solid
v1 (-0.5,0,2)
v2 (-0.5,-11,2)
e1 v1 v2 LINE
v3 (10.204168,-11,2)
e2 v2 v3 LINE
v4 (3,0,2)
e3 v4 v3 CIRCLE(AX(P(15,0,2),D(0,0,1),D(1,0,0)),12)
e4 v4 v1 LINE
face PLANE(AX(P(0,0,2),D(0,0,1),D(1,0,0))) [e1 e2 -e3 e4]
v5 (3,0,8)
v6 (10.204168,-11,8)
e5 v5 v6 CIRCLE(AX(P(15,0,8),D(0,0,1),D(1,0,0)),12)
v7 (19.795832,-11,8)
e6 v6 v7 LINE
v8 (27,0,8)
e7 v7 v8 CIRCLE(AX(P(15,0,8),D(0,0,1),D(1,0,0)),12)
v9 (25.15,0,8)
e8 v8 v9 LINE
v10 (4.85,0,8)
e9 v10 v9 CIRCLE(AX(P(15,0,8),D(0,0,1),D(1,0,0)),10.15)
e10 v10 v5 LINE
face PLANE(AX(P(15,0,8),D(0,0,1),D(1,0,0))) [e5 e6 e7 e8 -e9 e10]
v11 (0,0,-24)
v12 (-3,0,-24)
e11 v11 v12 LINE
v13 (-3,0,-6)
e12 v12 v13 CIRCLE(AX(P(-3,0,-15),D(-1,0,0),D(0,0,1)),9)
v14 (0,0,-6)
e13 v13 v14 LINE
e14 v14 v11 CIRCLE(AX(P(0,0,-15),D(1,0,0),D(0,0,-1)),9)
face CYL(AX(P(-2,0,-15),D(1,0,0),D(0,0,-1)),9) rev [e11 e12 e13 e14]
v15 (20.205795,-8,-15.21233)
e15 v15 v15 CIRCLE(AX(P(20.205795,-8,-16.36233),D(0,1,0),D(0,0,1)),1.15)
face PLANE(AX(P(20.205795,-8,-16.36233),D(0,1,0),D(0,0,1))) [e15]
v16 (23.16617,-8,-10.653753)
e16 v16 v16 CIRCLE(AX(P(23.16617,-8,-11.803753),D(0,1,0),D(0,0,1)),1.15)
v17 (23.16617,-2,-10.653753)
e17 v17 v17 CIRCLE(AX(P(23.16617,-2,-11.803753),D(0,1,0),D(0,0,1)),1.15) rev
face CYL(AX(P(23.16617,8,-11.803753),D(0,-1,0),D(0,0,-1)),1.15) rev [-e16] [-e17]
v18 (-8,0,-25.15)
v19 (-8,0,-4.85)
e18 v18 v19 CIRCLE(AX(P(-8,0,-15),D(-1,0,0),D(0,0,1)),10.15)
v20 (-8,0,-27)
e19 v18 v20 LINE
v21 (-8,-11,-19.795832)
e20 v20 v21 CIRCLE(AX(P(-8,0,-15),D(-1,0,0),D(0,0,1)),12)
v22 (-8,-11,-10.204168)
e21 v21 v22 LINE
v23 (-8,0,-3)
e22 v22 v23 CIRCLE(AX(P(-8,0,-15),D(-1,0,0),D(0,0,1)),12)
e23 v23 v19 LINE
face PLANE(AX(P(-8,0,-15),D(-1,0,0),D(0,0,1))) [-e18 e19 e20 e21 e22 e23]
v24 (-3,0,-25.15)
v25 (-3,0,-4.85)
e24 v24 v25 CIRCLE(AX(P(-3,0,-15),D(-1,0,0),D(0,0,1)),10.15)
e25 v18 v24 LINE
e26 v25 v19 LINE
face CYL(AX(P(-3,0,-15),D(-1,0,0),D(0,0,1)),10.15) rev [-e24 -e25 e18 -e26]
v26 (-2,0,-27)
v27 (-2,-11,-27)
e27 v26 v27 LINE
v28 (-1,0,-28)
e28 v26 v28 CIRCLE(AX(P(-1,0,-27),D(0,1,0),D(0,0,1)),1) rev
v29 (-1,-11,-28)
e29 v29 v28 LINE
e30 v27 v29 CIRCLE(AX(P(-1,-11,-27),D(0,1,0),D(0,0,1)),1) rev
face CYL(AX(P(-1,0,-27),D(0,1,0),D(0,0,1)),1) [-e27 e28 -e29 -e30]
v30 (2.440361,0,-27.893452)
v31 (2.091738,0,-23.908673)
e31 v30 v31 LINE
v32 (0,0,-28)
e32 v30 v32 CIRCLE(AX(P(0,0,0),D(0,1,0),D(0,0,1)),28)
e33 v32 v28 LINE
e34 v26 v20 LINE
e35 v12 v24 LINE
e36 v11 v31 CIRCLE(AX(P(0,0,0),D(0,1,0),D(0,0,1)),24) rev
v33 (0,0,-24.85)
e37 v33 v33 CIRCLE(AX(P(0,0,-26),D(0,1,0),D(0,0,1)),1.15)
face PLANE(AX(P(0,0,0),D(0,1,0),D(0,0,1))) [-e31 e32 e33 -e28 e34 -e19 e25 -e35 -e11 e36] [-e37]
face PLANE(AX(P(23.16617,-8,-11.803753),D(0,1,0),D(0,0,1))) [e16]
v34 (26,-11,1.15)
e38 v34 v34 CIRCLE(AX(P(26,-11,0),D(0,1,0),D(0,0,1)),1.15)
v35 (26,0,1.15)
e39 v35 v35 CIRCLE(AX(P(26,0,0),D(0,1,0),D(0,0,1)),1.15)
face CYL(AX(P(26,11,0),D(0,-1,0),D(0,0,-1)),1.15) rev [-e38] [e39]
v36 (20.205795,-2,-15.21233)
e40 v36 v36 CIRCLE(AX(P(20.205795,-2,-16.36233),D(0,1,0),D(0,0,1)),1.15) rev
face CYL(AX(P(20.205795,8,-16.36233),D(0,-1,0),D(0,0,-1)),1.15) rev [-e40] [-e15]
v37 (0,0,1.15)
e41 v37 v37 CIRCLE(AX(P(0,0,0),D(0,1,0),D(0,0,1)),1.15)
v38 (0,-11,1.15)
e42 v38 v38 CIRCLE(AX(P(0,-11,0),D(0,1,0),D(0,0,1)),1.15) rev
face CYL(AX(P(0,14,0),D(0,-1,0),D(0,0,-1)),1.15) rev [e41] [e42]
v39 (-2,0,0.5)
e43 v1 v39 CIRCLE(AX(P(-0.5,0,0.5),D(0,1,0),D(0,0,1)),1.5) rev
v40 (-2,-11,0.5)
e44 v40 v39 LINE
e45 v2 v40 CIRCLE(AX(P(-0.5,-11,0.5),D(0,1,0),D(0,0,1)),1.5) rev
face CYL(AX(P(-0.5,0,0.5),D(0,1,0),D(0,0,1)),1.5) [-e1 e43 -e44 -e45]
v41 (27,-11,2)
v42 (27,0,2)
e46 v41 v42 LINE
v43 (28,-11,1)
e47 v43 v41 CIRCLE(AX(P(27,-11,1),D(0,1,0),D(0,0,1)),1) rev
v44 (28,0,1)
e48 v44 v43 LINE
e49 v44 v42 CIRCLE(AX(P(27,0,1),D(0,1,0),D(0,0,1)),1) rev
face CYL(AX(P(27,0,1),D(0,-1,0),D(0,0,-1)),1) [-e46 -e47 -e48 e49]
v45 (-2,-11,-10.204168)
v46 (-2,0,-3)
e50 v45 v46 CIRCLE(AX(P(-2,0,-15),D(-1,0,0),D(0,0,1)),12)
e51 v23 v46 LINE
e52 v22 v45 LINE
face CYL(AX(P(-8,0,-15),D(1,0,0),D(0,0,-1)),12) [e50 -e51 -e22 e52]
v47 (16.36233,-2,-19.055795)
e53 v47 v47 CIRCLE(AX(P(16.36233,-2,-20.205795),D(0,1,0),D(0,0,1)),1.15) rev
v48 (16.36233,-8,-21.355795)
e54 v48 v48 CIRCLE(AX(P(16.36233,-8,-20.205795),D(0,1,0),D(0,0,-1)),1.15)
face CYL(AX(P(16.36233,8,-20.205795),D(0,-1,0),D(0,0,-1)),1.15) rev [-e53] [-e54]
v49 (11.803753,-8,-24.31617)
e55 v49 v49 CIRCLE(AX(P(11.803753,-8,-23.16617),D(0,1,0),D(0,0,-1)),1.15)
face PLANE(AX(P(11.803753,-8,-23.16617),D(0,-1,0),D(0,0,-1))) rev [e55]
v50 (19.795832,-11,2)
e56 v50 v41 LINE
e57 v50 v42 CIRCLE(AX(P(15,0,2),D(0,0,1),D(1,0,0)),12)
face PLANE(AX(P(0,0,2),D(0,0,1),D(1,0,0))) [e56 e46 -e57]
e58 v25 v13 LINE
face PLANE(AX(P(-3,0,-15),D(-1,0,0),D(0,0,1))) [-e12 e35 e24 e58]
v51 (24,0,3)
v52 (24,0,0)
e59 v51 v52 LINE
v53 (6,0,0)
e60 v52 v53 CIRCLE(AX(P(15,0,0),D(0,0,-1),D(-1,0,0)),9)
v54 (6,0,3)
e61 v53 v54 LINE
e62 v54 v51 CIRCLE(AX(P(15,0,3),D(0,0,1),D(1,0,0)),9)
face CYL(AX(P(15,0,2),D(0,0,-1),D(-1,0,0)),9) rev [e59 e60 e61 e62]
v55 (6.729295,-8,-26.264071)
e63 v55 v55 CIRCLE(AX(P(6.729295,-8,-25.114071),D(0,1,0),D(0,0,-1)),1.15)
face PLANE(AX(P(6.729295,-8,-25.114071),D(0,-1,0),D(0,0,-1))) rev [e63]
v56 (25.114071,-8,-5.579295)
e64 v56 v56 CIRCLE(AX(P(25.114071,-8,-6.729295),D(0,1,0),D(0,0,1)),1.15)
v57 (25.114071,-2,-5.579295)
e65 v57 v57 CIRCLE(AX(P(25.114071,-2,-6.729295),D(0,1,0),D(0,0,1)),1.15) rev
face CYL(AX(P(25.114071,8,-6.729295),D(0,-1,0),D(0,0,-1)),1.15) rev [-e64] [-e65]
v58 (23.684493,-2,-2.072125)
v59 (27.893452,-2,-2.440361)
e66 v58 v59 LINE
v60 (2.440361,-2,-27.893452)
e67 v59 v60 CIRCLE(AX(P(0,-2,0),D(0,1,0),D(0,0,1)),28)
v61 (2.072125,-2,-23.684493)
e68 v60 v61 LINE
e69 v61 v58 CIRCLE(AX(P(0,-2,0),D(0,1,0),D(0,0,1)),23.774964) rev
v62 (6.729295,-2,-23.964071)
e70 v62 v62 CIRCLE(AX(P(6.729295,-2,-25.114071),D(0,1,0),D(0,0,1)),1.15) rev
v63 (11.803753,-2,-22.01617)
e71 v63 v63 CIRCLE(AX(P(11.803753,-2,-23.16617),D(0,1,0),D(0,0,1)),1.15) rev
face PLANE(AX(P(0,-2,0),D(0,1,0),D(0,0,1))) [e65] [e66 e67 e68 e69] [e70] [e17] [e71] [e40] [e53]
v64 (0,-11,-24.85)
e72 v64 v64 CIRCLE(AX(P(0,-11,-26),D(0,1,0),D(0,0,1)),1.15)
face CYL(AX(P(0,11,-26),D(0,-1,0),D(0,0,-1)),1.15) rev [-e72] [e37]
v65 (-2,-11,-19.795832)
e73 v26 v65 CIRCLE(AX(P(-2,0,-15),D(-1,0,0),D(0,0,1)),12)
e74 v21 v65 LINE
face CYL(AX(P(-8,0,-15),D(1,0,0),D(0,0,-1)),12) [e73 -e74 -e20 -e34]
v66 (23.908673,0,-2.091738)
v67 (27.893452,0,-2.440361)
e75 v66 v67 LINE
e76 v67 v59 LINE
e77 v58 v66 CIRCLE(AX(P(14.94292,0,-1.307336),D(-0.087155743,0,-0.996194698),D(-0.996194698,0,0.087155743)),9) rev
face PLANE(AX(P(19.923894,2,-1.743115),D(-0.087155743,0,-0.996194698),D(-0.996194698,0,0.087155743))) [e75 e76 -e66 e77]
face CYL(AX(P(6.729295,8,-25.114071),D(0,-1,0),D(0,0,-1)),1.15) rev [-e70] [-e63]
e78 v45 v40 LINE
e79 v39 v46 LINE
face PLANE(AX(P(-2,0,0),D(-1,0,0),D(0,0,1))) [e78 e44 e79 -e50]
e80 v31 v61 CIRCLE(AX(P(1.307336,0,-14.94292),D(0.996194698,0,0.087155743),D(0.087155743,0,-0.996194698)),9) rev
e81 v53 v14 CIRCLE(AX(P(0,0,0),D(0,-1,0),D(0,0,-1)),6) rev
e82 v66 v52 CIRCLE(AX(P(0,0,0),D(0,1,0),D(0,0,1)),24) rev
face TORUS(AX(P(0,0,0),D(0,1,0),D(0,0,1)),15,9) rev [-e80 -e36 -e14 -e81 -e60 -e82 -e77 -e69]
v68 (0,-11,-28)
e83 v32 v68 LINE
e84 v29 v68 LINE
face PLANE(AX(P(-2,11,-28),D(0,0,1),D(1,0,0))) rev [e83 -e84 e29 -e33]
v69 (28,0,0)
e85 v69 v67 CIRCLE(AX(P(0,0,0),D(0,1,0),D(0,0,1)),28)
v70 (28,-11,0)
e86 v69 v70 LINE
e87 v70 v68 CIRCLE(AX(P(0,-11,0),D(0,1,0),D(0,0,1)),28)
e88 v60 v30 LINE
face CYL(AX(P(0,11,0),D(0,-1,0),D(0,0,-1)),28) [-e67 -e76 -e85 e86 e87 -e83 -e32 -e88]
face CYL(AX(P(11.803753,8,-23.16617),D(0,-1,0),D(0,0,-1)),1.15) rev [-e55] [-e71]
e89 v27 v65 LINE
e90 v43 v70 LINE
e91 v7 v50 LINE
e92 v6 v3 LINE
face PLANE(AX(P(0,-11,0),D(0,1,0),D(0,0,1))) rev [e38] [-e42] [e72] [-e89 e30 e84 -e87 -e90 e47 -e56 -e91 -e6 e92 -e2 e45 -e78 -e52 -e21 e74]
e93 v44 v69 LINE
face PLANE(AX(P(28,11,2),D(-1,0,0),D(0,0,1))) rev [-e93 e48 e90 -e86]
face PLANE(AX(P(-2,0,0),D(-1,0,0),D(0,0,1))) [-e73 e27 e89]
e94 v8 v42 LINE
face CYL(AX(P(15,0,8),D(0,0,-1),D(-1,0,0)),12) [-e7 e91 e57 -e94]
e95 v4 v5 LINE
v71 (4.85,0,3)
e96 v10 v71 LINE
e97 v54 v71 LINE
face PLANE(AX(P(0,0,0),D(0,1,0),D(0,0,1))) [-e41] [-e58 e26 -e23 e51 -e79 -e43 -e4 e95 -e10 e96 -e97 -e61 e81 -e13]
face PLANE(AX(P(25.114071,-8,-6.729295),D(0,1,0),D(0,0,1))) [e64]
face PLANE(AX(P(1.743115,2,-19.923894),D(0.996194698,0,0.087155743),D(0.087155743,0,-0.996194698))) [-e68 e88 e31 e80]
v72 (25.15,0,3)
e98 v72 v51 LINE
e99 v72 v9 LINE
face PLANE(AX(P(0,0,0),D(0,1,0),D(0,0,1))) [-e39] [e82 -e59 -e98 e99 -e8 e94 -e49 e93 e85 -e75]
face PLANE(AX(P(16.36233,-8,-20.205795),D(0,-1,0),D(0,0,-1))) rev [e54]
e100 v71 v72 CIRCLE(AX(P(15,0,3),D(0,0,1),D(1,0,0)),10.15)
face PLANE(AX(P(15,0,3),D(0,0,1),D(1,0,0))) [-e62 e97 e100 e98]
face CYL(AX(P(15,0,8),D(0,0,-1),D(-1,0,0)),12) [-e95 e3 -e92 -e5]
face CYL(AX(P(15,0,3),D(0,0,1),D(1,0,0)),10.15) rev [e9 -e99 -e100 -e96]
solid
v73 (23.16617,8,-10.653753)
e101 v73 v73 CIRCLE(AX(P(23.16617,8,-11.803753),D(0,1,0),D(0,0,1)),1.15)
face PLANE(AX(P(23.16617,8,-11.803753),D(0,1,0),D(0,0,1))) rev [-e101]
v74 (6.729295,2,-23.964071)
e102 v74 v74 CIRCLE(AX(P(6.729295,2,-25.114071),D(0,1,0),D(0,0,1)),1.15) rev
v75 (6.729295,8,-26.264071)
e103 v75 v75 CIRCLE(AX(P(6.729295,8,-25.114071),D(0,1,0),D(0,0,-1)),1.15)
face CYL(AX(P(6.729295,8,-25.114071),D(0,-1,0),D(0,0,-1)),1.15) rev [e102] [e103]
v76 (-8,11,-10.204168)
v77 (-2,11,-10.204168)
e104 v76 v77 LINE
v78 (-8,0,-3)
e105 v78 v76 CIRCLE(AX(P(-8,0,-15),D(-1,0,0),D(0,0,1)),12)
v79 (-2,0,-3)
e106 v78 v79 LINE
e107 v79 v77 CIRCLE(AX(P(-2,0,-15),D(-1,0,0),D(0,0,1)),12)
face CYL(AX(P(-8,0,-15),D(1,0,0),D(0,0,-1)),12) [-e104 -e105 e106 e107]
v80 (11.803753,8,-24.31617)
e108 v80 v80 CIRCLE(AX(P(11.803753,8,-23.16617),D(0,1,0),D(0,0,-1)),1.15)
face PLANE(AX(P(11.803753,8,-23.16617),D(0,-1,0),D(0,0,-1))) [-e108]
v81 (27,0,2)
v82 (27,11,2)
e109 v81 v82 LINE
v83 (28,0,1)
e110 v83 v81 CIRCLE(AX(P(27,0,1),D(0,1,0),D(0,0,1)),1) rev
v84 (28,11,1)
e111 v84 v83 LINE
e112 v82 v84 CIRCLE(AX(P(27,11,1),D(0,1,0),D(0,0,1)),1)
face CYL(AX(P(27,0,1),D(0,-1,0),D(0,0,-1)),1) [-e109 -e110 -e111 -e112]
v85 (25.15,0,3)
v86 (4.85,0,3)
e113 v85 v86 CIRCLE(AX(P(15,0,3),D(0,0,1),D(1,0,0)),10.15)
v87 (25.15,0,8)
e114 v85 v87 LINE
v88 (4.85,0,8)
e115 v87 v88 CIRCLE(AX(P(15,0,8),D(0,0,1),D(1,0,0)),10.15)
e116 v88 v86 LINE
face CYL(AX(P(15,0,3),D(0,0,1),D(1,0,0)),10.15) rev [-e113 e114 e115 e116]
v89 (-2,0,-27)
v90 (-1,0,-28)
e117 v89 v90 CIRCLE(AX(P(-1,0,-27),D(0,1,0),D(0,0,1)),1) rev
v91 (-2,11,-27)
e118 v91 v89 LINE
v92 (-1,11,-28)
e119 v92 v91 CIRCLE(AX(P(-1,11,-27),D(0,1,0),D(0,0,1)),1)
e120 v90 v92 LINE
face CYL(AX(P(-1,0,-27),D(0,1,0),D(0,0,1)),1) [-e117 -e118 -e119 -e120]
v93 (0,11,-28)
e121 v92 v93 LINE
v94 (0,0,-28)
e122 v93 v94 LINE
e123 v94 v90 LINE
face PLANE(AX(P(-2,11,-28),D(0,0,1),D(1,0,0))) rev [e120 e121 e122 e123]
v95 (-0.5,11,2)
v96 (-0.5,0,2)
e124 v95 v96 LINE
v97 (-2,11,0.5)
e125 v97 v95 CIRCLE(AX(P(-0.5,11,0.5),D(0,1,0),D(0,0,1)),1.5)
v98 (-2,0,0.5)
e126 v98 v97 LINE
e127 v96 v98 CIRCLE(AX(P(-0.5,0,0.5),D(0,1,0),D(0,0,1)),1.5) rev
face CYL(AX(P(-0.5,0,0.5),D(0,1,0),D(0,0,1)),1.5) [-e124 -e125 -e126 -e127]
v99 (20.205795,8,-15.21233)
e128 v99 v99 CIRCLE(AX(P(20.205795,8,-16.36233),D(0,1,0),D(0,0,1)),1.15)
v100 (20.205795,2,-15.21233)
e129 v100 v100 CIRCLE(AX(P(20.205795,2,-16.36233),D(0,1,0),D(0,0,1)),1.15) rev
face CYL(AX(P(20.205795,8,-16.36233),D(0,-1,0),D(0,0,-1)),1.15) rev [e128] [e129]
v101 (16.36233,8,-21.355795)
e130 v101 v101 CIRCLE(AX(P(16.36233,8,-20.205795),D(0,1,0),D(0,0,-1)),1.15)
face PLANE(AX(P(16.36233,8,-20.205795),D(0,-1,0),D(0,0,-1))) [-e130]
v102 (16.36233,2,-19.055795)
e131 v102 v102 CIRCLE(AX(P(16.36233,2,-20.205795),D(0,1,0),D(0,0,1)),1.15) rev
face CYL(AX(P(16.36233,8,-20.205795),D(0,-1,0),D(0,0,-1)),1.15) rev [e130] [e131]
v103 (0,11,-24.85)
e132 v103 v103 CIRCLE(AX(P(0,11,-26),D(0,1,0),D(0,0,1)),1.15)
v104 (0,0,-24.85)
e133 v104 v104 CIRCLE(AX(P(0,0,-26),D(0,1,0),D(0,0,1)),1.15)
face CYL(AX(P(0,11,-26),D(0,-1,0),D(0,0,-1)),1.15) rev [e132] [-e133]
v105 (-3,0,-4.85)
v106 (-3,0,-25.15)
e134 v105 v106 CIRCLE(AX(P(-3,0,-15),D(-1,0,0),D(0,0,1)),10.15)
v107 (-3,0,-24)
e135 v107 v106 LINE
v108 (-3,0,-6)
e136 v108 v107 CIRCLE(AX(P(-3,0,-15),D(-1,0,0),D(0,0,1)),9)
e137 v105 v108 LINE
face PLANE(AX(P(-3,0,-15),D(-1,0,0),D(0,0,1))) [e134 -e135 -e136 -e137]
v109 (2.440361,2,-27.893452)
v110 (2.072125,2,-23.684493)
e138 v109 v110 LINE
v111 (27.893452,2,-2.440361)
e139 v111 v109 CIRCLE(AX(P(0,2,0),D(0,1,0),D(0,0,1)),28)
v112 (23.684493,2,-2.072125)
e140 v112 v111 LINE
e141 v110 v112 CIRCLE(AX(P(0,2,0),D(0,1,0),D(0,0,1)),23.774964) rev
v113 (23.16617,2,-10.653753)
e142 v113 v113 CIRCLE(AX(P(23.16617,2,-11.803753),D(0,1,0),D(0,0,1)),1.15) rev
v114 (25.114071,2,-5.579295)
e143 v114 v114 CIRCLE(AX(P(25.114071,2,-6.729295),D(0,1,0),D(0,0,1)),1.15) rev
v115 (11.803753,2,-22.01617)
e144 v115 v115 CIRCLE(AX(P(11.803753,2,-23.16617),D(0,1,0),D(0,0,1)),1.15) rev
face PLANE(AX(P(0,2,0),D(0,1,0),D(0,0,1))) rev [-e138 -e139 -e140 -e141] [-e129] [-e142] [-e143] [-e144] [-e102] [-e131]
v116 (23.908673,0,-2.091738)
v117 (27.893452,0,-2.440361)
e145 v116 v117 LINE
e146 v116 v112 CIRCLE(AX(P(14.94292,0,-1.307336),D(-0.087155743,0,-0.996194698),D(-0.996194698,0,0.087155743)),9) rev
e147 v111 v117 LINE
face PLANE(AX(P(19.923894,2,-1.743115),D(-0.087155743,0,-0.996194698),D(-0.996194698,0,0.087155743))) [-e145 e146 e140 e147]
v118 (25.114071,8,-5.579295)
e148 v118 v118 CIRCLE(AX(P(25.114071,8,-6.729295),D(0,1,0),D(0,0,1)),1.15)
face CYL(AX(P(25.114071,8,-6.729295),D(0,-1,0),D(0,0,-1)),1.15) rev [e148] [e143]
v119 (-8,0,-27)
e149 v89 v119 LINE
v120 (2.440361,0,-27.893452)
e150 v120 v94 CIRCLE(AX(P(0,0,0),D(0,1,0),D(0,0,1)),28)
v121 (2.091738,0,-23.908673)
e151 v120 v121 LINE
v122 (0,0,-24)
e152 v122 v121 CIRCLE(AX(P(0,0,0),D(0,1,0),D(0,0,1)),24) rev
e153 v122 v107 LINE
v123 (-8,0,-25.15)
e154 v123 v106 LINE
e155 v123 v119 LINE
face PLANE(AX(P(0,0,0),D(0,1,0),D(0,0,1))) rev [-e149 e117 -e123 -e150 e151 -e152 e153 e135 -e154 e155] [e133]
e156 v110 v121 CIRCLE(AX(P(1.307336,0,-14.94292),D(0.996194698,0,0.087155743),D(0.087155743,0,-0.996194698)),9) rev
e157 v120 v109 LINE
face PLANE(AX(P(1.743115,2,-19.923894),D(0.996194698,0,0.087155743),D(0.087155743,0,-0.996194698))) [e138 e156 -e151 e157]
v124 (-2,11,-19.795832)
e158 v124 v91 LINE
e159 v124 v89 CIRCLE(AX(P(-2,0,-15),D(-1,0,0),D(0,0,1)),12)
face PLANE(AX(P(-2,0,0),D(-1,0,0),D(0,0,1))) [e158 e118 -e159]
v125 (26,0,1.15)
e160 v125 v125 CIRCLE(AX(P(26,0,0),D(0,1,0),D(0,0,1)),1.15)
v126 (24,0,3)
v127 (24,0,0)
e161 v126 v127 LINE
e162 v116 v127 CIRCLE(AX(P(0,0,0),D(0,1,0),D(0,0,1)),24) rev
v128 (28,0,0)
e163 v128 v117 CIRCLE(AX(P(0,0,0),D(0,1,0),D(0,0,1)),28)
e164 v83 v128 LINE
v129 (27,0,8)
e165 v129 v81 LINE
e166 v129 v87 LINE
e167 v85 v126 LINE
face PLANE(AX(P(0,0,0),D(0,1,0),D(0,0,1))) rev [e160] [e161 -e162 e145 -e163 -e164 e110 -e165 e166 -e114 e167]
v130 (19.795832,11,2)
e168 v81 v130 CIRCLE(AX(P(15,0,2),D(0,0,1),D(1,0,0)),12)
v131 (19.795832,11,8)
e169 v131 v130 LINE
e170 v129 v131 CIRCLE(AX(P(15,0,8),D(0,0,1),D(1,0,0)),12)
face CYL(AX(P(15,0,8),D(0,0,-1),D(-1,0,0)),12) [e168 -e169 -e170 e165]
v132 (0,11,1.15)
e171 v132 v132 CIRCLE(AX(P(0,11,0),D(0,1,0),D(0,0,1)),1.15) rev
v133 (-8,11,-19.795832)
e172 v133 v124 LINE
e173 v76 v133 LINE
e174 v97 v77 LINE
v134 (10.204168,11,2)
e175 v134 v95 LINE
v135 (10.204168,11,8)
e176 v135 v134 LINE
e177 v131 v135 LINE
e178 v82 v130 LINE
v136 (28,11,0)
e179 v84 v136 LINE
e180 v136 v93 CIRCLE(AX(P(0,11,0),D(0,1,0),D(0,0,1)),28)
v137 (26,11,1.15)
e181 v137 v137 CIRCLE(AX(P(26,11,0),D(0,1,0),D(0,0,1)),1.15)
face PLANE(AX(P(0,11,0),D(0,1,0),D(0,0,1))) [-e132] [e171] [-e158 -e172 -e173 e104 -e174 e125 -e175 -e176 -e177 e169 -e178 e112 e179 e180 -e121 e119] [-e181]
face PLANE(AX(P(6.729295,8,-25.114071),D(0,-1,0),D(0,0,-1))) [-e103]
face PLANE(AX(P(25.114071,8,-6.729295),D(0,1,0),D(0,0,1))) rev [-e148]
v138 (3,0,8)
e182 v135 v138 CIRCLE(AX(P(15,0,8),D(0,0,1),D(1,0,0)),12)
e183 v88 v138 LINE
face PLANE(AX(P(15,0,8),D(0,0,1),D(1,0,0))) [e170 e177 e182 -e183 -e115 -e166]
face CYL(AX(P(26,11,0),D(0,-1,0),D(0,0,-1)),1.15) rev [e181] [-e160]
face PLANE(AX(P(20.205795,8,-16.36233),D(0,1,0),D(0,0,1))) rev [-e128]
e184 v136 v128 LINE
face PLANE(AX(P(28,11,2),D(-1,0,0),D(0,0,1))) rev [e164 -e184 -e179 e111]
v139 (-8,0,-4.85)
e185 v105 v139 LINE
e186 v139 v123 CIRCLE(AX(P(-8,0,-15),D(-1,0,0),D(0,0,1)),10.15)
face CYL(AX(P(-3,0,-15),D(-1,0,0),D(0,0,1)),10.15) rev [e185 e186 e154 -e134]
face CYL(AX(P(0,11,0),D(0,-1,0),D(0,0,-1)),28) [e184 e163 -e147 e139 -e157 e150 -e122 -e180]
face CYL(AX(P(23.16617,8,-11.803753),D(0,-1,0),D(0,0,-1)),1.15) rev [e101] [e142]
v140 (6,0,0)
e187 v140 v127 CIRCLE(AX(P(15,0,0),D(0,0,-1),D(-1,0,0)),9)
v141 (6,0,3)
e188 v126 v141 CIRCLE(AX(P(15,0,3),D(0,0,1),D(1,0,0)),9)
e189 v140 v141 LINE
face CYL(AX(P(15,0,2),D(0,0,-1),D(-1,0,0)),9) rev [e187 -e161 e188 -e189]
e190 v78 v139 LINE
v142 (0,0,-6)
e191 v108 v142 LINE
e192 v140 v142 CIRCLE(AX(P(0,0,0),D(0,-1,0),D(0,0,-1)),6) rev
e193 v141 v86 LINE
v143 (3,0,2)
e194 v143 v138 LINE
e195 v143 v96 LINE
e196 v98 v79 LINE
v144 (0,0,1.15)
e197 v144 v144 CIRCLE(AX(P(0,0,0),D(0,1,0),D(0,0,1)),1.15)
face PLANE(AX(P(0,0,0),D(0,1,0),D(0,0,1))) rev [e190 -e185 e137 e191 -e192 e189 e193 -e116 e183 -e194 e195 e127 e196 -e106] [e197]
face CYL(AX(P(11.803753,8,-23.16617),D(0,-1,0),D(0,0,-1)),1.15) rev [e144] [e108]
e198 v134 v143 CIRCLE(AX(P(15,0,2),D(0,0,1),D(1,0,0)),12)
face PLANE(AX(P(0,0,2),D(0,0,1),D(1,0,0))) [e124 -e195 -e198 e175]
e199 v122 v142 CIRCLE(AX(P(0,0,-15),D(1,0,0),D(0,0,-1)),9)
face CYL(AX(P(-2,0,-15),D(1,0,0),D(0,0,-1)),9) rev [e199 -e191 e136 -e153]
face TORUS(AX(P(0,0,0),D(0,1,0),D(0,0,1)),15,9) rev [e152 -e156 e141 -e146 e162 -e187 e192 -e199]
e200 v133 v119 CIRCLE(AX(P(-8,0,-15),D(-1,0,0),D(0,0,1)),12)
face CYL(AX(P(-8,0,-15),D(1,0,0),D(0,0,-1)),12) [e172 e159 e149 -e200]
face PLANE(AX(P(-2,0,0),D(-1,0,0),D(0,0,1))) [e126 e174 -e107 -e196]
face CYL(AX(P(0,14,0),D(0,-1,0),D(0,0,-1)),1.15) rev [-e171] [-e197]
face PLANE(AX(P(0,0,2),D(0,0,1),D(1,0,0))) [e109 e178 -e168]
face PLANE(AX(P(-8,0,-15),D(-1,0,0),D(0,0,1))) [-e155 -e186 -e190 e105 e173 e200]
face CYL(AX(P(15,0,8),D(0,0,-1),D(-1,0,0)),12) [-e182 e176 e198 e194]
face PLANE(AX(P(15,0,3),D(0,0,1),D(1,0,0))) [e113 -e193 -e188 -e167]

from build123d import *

# Parameters (mm, degrees)
EXTRUDE_1_DEPTH          = 11
SWEEP_2_PROFILE_R        = 9
SKETCH_16_W              = 26
SKETCH_16_H              = 22
SKETCH_16_R              = 9
EXTRUDE_3_DEPTH          = 2
SKETCH_17_W              = 26
SKETCH_17_H              = 22
SKETCH_17_R              = 9
EXTRUDE_4_DEPTH          = 2
SKETCH_18_R              = 9
EXTRUDE_5_DEPTH          = 6
SKETCH_19_R              = 9
EXTRUDE_6_DEPTH          = 6
EXTRUDE_8_DEPTH          = 11
EXTRUDE_8_DEPTH_BACK     = 11
CUT_EXTRUDE_1_DEPTH      = 14
CUT_EXTRUDE_1_DEPTH_BACK = 13
SKETCH_23_R              = 1.15
CUT_EXTRUDE_2_DEPTH      = 11
CUT_EXTRUDE_2_DEPTH_BACK = 11
SKETCH_24_R              = 1.15
CUT_EXTRUDE_3_DEPTH      = 11
CUT_EXTRUDE_3_DEPTH_BACK = 11
SKETCH_25_R              = 1.15
CUT_EXTRUDE_6_DEPTH      = 2
CUT_EXTRUDE_6_DEPTH_BACK = 2
CUT_EXTRUDE_7_DEPTH      = 8
CUT_EXTRUDE_7_DEPTH_BACK = 8
SKETCH_27_R              = 1.15
SKETCH_28_R              = 10.15
CUT_EXTRUDE_8_DEPTH      = 5
FILLET_1_R               = 1.5
FILLET_2_R               = 1
SKETCH_29_R              = 10.15
CUT_EXTRUDE_10_DEPTH     = 5


with BuildPart() as part:
    # 草图1 → 凸台-拉伸1 (new, symmetric)
    with BuildSketch(Plane(origin=(0, 0, 0), x_dir=(1, 0, 0), z_dir=(0, 1, 0))):
        with BuildLine():
            Line((2, 0), (28, 0))
            ThreePointArc((28, 0), (19.798989873, 19.798989873), (0, 28))
            Line((0, 28), (0, 2))
            ThreePointArc((0, 2), (1.414213562, 1.414213562), (2, 0))
        make_face()
    extrude(amount=EXTRUDE_1_DEPTH, both=True)

    # 切除-扫描2: sweep along a path in 草图9
    with BuildLine(Plane(origin=(0, 0, 0), x_dir=(1, 0, 0), z_dir=(0, 1, 0))) as sweep_2_path:
        CenterArc((0, 0), 15, 0, 360)
    # 切除-扫描2 profile (on start of the path) → 切除-扫描2 (sweep, cut)
    with BuildSketch(Plane(origin=(15, 0, 0), x_dir=(-1, 0, 0), z_dir=(0, 0, -1))):
        Circle(SWEEP_2_PROFILE_R)
    sweep(path=sweep_2_path.line, mode=Mode.SUBTRACT)

    # 草图16 → 凸台-拉伸3 (add)
    with BuildSketch(Plane.XY):
        with Locations((15, 0)):
            Rectangle(SKETCH_16_W, SKETCH_16_H)
        with Locations((15, 0)):
            Circle(SKETCH_16_R, mode=Mode.SUBTRACT)
    extrude(amount=EXTRUDE_3_DEPTH)

    # 草图17 → 凸台-拉伸4 (add)
    with BuildSketch(Plane.ZY):
        with Locations((-15, 0)):
            Rectangle(SKETCH_17_W, SKETCH_17_H)
        with Locations(Location((-15, 0, 0), (0, 0, 180))):
            Circle(SKETCH_17_R, mode=Mode.SUBTRACT)
    extrude(amount=EXTRUDE_4_DEPTH)

    # 草图18 → 凸台-拉伸5 (add)
    with BuildSketch(Plane.XY.offset(2)):
        with BuildLine():
            Line((10.204168477, 11), (19.795831523, 11))
            ThreePointArc((19.795831523, 11), (27, 0), (19.795831523, -11))
            Line((19.795831523, -11), (10.204168477, -11))
            ThreePointArc((10.204168477, -11), (3, 0), (10.204168477, 11))
        make_face()
        with Locations((15, 0)):
            Circle(SKETCH_18_R, mode=Mode.SUBTRACT)
    extrude(amount=EXTRUDE_5_DEPTH)

    # 草图19 → 凸台-拉伸6 (add)
    with BuildSketch(Plane.ZY.offset(2)):
        with BuildLine():
            Line((-19.795831523, 11), (-10.204168477, 11))
            ThreePointArc((-10.204168477, 11), (-3, 0), (-10.204168477, -11))
            Line((-10.204168477, -11), (-19.795831523, -11))
            ThreePointArc((-19.795831523, -11), (-27, 0), (-19.795831523, 11))
        make_face()
        with Locations(Location((-15, 0, 0), (0, 0, 180))):
            Circle(SKETCH_19_R, mode=Mode.SUBTRACT)
    extrude(amount=EXTRUDE_6_DEPTH)

    # 草图21 → 凸台-拉伸8 (add, two sides: drawn at the far end of the back side and taken through both)
    with BuildSketch(Plane(origin=(0, 0, 0), x_dir=(1, 0, 0), z_dir=(0, 1, 0)).offset(-EXTRUDE_8_DEPTH_BACK)):
        with BuildLine():
            Line((-2, 2), (-2, -2))
            Line((-2, -2), (2, -2))
            Line((2, -2), (2, 0))
            ThreePointArc((2, 0), (1.414213562, 1.414213562), (0, 2))
            Line((0, 2), (-2, 2))
        make_face()
    extrude(amount=EXTRUDE_8_DEPTH + EXTRUDE_8_DEPTH_BACK)

    # 草图23 → 切除-拉伸1 (cut, two sides: drawn at the far end of the back side and taken through both)
    with BuildSketch(Plane(origin=(0, 0, 0), x_dir=(1, 0, 0), z_dir=(0, 1, 0)).offset(-CUT_EXTRUDE_1_DEPTH_BACK)):
        with Locations(Location((0, 0, 0), (0, 0, 270))):
            Circle(SKETCH_23_R)
    extrude(amount=CUT_EXTRUDE_1_DEPTH + CUT_EXTRUDE_1_DEPTH_BACK, mode=Mode.SUBTRACT)

    # 草图24 → 切除-拉伸2 (cut, two sides: drawn at the far end of the back side and taken through both)
    with BuildSketch(Plane(origin=(0, 0, 0), x_dir=(1, 0, 0), z_dir=(0, 1, 0)).offset(-CUT_EXTRUDE_2_DEPTH_BACK)):
        with Locations(Location((26, 0, 0), (0, 0, 270))):
            Circle(SKETCH_24_R)
    extrude(amount=CUT_EXTRUDE_2_DEPTH + CUT_EXTRUDE_2_DEPTH_BACK, mode=Mode.SUBTRACT)

    # 草图25 → 切除-拉伸3 (cut, two sides: drawn at the far end of the back side and taken through both)
    with BuildSketch(Plane(origin=(0, 0, 0), x_dir=(1, 0, 0), z_dir=(0, 1, 0)).offset(-CUT_EXTRUDE_3_DEPTH_BACK)):
        with Locations(Location((0, 26, 0), (0, 0, 270))):
            Circle(SKETCH_25_R)
    extrude(amount=CUT_EXTRUDE_3_DEPTH + CUT_EXTRUDE_3_DEPTH_BACK, mode=Mode.SUBTRACT)

    # 草图26 → 切除-拉伸6 (cut, two sides: drawn at the far end of the back side and taken through both)
    with BuildSketch(Plane(origin=(0, 0, 0), x_dir=(1, 0, 0), z_dir=(0, 1, 0)).offset(-CUT_EXTRUDE_6_DEPTH_BACK)):
        with BuildLine():
            Line((19.923893962, 1.743114855), (29.885840943, 2.614672282))
            ThreePointArc((29.885840943, 2.614672282), (21.213203436, 21.213203436), (2.614672282, 29.885840943))
            Line((2.614672282, 29.885840943), (1.743114855, 19.923893962))
            ThreePointArc((1.743114855, 19.923893962), (14.142135624, 14.142135624), (19.923893962, 1.743114855))
        make_face()
    extrude(amount=CUT_EXTRUDE_6_DEPTH + CUT_EXTRUDE_6_DEPTH_BACK, mode=Mode.SUBTRACT)

    # 草图27 → 切除-拉伸7 (cut, two sides: drawn at the far end of the back side and taken through both)
    with BuildSketch(Plane(origin=(0, 0, 0), x_dir=(1, 0, 0), z_dir=(0, 1, 0)).offset(-CUT_EXTRUDE_7_DEPTH_BACK)):
        with Locations(Location((25.114071484, 6.729295173, 0), (0, 0, 270))):
            Circle(SKETCH_27_R)
        with Locations(Location((23.166169629, 11.803752993, 0), (0, 0, 270))):
            Circle(SKETCH_27_R)
        with Locations(Location((20.205794998, 16.362330167, 0), (0, 0, 270))):
            Circle(SKETCH_27_R)
        with Locations(Location((6.729295173, 25.114071484, 0), (0, 0, 90))):
            Circle(SKETCH_27_R)
        with Locations(Location((11.803752993, 23.166169629, 0), (0, 0, 90))):
            Circle(SKETCH_27_R)
        with Locations(Location((16.362330167, 20.205794998, 0), (0, 0, 90))):
            Circle(SKETCH_27_R)
    extrude(amount=CUT_EXTRUDE_7_DEPTH + CUT_EXTRUDE_7_DEPTH_BACK, mode=Mode.SUBTRACT)

    # 草图28 → 切除-拉伸8 (cut)
    with BuildSketch(Plane.XY.offset(8)):
        with Locations((15, 0)):
            Circle(SKETCH_28_R)
    extrude(amount=-CUT_EXTRUDE_8_DEPTH, mode=Mode.SUBTRACT)

    # 圆角1
    fillet_1_edges = [part.edges().sort_by_distance(p)[0] for p in [
        (-2, 0, 2),
    ]]
    fillet(fillet_1_edges, radius=FILLET_1_R)

    # 圆角2
    fillet_2_edges = [part.edges().sort_by_distance(p)[0] for p in [
        (28, 0, 2),
        (-2, 0, -28),
    ]]
    fillet(fillet_2_edges, radius=FILLET_2_R - 0.0001)  # a hair under: the kernel refuses the full size

    # 草图29 → 切除-拉伸10 (cut)
    with BuildSketch(Plane.ZY.offset(8)):
        with Locations((-15, 0)):
            Circle(SKETCH_29_R)
    extrude(amount=-CUT_EXTRUDE_10_DEPTH, mode=Mode.SUBTRACT)


with BuildPart() as body_2:
    # Split Bodies 1: the piece on the far side of the plane
    add(part.part)
    split(bisect_by=Plane.ZX, keep=Keep.BOTTOM)


with BuildPart() as part_1:
    add(part.part)

    # Split Bodies 1
    split(bisect_by=Plane.ZX, keep=Keep.TOP)


solid = Compound([body_2.part, part_1.part])
